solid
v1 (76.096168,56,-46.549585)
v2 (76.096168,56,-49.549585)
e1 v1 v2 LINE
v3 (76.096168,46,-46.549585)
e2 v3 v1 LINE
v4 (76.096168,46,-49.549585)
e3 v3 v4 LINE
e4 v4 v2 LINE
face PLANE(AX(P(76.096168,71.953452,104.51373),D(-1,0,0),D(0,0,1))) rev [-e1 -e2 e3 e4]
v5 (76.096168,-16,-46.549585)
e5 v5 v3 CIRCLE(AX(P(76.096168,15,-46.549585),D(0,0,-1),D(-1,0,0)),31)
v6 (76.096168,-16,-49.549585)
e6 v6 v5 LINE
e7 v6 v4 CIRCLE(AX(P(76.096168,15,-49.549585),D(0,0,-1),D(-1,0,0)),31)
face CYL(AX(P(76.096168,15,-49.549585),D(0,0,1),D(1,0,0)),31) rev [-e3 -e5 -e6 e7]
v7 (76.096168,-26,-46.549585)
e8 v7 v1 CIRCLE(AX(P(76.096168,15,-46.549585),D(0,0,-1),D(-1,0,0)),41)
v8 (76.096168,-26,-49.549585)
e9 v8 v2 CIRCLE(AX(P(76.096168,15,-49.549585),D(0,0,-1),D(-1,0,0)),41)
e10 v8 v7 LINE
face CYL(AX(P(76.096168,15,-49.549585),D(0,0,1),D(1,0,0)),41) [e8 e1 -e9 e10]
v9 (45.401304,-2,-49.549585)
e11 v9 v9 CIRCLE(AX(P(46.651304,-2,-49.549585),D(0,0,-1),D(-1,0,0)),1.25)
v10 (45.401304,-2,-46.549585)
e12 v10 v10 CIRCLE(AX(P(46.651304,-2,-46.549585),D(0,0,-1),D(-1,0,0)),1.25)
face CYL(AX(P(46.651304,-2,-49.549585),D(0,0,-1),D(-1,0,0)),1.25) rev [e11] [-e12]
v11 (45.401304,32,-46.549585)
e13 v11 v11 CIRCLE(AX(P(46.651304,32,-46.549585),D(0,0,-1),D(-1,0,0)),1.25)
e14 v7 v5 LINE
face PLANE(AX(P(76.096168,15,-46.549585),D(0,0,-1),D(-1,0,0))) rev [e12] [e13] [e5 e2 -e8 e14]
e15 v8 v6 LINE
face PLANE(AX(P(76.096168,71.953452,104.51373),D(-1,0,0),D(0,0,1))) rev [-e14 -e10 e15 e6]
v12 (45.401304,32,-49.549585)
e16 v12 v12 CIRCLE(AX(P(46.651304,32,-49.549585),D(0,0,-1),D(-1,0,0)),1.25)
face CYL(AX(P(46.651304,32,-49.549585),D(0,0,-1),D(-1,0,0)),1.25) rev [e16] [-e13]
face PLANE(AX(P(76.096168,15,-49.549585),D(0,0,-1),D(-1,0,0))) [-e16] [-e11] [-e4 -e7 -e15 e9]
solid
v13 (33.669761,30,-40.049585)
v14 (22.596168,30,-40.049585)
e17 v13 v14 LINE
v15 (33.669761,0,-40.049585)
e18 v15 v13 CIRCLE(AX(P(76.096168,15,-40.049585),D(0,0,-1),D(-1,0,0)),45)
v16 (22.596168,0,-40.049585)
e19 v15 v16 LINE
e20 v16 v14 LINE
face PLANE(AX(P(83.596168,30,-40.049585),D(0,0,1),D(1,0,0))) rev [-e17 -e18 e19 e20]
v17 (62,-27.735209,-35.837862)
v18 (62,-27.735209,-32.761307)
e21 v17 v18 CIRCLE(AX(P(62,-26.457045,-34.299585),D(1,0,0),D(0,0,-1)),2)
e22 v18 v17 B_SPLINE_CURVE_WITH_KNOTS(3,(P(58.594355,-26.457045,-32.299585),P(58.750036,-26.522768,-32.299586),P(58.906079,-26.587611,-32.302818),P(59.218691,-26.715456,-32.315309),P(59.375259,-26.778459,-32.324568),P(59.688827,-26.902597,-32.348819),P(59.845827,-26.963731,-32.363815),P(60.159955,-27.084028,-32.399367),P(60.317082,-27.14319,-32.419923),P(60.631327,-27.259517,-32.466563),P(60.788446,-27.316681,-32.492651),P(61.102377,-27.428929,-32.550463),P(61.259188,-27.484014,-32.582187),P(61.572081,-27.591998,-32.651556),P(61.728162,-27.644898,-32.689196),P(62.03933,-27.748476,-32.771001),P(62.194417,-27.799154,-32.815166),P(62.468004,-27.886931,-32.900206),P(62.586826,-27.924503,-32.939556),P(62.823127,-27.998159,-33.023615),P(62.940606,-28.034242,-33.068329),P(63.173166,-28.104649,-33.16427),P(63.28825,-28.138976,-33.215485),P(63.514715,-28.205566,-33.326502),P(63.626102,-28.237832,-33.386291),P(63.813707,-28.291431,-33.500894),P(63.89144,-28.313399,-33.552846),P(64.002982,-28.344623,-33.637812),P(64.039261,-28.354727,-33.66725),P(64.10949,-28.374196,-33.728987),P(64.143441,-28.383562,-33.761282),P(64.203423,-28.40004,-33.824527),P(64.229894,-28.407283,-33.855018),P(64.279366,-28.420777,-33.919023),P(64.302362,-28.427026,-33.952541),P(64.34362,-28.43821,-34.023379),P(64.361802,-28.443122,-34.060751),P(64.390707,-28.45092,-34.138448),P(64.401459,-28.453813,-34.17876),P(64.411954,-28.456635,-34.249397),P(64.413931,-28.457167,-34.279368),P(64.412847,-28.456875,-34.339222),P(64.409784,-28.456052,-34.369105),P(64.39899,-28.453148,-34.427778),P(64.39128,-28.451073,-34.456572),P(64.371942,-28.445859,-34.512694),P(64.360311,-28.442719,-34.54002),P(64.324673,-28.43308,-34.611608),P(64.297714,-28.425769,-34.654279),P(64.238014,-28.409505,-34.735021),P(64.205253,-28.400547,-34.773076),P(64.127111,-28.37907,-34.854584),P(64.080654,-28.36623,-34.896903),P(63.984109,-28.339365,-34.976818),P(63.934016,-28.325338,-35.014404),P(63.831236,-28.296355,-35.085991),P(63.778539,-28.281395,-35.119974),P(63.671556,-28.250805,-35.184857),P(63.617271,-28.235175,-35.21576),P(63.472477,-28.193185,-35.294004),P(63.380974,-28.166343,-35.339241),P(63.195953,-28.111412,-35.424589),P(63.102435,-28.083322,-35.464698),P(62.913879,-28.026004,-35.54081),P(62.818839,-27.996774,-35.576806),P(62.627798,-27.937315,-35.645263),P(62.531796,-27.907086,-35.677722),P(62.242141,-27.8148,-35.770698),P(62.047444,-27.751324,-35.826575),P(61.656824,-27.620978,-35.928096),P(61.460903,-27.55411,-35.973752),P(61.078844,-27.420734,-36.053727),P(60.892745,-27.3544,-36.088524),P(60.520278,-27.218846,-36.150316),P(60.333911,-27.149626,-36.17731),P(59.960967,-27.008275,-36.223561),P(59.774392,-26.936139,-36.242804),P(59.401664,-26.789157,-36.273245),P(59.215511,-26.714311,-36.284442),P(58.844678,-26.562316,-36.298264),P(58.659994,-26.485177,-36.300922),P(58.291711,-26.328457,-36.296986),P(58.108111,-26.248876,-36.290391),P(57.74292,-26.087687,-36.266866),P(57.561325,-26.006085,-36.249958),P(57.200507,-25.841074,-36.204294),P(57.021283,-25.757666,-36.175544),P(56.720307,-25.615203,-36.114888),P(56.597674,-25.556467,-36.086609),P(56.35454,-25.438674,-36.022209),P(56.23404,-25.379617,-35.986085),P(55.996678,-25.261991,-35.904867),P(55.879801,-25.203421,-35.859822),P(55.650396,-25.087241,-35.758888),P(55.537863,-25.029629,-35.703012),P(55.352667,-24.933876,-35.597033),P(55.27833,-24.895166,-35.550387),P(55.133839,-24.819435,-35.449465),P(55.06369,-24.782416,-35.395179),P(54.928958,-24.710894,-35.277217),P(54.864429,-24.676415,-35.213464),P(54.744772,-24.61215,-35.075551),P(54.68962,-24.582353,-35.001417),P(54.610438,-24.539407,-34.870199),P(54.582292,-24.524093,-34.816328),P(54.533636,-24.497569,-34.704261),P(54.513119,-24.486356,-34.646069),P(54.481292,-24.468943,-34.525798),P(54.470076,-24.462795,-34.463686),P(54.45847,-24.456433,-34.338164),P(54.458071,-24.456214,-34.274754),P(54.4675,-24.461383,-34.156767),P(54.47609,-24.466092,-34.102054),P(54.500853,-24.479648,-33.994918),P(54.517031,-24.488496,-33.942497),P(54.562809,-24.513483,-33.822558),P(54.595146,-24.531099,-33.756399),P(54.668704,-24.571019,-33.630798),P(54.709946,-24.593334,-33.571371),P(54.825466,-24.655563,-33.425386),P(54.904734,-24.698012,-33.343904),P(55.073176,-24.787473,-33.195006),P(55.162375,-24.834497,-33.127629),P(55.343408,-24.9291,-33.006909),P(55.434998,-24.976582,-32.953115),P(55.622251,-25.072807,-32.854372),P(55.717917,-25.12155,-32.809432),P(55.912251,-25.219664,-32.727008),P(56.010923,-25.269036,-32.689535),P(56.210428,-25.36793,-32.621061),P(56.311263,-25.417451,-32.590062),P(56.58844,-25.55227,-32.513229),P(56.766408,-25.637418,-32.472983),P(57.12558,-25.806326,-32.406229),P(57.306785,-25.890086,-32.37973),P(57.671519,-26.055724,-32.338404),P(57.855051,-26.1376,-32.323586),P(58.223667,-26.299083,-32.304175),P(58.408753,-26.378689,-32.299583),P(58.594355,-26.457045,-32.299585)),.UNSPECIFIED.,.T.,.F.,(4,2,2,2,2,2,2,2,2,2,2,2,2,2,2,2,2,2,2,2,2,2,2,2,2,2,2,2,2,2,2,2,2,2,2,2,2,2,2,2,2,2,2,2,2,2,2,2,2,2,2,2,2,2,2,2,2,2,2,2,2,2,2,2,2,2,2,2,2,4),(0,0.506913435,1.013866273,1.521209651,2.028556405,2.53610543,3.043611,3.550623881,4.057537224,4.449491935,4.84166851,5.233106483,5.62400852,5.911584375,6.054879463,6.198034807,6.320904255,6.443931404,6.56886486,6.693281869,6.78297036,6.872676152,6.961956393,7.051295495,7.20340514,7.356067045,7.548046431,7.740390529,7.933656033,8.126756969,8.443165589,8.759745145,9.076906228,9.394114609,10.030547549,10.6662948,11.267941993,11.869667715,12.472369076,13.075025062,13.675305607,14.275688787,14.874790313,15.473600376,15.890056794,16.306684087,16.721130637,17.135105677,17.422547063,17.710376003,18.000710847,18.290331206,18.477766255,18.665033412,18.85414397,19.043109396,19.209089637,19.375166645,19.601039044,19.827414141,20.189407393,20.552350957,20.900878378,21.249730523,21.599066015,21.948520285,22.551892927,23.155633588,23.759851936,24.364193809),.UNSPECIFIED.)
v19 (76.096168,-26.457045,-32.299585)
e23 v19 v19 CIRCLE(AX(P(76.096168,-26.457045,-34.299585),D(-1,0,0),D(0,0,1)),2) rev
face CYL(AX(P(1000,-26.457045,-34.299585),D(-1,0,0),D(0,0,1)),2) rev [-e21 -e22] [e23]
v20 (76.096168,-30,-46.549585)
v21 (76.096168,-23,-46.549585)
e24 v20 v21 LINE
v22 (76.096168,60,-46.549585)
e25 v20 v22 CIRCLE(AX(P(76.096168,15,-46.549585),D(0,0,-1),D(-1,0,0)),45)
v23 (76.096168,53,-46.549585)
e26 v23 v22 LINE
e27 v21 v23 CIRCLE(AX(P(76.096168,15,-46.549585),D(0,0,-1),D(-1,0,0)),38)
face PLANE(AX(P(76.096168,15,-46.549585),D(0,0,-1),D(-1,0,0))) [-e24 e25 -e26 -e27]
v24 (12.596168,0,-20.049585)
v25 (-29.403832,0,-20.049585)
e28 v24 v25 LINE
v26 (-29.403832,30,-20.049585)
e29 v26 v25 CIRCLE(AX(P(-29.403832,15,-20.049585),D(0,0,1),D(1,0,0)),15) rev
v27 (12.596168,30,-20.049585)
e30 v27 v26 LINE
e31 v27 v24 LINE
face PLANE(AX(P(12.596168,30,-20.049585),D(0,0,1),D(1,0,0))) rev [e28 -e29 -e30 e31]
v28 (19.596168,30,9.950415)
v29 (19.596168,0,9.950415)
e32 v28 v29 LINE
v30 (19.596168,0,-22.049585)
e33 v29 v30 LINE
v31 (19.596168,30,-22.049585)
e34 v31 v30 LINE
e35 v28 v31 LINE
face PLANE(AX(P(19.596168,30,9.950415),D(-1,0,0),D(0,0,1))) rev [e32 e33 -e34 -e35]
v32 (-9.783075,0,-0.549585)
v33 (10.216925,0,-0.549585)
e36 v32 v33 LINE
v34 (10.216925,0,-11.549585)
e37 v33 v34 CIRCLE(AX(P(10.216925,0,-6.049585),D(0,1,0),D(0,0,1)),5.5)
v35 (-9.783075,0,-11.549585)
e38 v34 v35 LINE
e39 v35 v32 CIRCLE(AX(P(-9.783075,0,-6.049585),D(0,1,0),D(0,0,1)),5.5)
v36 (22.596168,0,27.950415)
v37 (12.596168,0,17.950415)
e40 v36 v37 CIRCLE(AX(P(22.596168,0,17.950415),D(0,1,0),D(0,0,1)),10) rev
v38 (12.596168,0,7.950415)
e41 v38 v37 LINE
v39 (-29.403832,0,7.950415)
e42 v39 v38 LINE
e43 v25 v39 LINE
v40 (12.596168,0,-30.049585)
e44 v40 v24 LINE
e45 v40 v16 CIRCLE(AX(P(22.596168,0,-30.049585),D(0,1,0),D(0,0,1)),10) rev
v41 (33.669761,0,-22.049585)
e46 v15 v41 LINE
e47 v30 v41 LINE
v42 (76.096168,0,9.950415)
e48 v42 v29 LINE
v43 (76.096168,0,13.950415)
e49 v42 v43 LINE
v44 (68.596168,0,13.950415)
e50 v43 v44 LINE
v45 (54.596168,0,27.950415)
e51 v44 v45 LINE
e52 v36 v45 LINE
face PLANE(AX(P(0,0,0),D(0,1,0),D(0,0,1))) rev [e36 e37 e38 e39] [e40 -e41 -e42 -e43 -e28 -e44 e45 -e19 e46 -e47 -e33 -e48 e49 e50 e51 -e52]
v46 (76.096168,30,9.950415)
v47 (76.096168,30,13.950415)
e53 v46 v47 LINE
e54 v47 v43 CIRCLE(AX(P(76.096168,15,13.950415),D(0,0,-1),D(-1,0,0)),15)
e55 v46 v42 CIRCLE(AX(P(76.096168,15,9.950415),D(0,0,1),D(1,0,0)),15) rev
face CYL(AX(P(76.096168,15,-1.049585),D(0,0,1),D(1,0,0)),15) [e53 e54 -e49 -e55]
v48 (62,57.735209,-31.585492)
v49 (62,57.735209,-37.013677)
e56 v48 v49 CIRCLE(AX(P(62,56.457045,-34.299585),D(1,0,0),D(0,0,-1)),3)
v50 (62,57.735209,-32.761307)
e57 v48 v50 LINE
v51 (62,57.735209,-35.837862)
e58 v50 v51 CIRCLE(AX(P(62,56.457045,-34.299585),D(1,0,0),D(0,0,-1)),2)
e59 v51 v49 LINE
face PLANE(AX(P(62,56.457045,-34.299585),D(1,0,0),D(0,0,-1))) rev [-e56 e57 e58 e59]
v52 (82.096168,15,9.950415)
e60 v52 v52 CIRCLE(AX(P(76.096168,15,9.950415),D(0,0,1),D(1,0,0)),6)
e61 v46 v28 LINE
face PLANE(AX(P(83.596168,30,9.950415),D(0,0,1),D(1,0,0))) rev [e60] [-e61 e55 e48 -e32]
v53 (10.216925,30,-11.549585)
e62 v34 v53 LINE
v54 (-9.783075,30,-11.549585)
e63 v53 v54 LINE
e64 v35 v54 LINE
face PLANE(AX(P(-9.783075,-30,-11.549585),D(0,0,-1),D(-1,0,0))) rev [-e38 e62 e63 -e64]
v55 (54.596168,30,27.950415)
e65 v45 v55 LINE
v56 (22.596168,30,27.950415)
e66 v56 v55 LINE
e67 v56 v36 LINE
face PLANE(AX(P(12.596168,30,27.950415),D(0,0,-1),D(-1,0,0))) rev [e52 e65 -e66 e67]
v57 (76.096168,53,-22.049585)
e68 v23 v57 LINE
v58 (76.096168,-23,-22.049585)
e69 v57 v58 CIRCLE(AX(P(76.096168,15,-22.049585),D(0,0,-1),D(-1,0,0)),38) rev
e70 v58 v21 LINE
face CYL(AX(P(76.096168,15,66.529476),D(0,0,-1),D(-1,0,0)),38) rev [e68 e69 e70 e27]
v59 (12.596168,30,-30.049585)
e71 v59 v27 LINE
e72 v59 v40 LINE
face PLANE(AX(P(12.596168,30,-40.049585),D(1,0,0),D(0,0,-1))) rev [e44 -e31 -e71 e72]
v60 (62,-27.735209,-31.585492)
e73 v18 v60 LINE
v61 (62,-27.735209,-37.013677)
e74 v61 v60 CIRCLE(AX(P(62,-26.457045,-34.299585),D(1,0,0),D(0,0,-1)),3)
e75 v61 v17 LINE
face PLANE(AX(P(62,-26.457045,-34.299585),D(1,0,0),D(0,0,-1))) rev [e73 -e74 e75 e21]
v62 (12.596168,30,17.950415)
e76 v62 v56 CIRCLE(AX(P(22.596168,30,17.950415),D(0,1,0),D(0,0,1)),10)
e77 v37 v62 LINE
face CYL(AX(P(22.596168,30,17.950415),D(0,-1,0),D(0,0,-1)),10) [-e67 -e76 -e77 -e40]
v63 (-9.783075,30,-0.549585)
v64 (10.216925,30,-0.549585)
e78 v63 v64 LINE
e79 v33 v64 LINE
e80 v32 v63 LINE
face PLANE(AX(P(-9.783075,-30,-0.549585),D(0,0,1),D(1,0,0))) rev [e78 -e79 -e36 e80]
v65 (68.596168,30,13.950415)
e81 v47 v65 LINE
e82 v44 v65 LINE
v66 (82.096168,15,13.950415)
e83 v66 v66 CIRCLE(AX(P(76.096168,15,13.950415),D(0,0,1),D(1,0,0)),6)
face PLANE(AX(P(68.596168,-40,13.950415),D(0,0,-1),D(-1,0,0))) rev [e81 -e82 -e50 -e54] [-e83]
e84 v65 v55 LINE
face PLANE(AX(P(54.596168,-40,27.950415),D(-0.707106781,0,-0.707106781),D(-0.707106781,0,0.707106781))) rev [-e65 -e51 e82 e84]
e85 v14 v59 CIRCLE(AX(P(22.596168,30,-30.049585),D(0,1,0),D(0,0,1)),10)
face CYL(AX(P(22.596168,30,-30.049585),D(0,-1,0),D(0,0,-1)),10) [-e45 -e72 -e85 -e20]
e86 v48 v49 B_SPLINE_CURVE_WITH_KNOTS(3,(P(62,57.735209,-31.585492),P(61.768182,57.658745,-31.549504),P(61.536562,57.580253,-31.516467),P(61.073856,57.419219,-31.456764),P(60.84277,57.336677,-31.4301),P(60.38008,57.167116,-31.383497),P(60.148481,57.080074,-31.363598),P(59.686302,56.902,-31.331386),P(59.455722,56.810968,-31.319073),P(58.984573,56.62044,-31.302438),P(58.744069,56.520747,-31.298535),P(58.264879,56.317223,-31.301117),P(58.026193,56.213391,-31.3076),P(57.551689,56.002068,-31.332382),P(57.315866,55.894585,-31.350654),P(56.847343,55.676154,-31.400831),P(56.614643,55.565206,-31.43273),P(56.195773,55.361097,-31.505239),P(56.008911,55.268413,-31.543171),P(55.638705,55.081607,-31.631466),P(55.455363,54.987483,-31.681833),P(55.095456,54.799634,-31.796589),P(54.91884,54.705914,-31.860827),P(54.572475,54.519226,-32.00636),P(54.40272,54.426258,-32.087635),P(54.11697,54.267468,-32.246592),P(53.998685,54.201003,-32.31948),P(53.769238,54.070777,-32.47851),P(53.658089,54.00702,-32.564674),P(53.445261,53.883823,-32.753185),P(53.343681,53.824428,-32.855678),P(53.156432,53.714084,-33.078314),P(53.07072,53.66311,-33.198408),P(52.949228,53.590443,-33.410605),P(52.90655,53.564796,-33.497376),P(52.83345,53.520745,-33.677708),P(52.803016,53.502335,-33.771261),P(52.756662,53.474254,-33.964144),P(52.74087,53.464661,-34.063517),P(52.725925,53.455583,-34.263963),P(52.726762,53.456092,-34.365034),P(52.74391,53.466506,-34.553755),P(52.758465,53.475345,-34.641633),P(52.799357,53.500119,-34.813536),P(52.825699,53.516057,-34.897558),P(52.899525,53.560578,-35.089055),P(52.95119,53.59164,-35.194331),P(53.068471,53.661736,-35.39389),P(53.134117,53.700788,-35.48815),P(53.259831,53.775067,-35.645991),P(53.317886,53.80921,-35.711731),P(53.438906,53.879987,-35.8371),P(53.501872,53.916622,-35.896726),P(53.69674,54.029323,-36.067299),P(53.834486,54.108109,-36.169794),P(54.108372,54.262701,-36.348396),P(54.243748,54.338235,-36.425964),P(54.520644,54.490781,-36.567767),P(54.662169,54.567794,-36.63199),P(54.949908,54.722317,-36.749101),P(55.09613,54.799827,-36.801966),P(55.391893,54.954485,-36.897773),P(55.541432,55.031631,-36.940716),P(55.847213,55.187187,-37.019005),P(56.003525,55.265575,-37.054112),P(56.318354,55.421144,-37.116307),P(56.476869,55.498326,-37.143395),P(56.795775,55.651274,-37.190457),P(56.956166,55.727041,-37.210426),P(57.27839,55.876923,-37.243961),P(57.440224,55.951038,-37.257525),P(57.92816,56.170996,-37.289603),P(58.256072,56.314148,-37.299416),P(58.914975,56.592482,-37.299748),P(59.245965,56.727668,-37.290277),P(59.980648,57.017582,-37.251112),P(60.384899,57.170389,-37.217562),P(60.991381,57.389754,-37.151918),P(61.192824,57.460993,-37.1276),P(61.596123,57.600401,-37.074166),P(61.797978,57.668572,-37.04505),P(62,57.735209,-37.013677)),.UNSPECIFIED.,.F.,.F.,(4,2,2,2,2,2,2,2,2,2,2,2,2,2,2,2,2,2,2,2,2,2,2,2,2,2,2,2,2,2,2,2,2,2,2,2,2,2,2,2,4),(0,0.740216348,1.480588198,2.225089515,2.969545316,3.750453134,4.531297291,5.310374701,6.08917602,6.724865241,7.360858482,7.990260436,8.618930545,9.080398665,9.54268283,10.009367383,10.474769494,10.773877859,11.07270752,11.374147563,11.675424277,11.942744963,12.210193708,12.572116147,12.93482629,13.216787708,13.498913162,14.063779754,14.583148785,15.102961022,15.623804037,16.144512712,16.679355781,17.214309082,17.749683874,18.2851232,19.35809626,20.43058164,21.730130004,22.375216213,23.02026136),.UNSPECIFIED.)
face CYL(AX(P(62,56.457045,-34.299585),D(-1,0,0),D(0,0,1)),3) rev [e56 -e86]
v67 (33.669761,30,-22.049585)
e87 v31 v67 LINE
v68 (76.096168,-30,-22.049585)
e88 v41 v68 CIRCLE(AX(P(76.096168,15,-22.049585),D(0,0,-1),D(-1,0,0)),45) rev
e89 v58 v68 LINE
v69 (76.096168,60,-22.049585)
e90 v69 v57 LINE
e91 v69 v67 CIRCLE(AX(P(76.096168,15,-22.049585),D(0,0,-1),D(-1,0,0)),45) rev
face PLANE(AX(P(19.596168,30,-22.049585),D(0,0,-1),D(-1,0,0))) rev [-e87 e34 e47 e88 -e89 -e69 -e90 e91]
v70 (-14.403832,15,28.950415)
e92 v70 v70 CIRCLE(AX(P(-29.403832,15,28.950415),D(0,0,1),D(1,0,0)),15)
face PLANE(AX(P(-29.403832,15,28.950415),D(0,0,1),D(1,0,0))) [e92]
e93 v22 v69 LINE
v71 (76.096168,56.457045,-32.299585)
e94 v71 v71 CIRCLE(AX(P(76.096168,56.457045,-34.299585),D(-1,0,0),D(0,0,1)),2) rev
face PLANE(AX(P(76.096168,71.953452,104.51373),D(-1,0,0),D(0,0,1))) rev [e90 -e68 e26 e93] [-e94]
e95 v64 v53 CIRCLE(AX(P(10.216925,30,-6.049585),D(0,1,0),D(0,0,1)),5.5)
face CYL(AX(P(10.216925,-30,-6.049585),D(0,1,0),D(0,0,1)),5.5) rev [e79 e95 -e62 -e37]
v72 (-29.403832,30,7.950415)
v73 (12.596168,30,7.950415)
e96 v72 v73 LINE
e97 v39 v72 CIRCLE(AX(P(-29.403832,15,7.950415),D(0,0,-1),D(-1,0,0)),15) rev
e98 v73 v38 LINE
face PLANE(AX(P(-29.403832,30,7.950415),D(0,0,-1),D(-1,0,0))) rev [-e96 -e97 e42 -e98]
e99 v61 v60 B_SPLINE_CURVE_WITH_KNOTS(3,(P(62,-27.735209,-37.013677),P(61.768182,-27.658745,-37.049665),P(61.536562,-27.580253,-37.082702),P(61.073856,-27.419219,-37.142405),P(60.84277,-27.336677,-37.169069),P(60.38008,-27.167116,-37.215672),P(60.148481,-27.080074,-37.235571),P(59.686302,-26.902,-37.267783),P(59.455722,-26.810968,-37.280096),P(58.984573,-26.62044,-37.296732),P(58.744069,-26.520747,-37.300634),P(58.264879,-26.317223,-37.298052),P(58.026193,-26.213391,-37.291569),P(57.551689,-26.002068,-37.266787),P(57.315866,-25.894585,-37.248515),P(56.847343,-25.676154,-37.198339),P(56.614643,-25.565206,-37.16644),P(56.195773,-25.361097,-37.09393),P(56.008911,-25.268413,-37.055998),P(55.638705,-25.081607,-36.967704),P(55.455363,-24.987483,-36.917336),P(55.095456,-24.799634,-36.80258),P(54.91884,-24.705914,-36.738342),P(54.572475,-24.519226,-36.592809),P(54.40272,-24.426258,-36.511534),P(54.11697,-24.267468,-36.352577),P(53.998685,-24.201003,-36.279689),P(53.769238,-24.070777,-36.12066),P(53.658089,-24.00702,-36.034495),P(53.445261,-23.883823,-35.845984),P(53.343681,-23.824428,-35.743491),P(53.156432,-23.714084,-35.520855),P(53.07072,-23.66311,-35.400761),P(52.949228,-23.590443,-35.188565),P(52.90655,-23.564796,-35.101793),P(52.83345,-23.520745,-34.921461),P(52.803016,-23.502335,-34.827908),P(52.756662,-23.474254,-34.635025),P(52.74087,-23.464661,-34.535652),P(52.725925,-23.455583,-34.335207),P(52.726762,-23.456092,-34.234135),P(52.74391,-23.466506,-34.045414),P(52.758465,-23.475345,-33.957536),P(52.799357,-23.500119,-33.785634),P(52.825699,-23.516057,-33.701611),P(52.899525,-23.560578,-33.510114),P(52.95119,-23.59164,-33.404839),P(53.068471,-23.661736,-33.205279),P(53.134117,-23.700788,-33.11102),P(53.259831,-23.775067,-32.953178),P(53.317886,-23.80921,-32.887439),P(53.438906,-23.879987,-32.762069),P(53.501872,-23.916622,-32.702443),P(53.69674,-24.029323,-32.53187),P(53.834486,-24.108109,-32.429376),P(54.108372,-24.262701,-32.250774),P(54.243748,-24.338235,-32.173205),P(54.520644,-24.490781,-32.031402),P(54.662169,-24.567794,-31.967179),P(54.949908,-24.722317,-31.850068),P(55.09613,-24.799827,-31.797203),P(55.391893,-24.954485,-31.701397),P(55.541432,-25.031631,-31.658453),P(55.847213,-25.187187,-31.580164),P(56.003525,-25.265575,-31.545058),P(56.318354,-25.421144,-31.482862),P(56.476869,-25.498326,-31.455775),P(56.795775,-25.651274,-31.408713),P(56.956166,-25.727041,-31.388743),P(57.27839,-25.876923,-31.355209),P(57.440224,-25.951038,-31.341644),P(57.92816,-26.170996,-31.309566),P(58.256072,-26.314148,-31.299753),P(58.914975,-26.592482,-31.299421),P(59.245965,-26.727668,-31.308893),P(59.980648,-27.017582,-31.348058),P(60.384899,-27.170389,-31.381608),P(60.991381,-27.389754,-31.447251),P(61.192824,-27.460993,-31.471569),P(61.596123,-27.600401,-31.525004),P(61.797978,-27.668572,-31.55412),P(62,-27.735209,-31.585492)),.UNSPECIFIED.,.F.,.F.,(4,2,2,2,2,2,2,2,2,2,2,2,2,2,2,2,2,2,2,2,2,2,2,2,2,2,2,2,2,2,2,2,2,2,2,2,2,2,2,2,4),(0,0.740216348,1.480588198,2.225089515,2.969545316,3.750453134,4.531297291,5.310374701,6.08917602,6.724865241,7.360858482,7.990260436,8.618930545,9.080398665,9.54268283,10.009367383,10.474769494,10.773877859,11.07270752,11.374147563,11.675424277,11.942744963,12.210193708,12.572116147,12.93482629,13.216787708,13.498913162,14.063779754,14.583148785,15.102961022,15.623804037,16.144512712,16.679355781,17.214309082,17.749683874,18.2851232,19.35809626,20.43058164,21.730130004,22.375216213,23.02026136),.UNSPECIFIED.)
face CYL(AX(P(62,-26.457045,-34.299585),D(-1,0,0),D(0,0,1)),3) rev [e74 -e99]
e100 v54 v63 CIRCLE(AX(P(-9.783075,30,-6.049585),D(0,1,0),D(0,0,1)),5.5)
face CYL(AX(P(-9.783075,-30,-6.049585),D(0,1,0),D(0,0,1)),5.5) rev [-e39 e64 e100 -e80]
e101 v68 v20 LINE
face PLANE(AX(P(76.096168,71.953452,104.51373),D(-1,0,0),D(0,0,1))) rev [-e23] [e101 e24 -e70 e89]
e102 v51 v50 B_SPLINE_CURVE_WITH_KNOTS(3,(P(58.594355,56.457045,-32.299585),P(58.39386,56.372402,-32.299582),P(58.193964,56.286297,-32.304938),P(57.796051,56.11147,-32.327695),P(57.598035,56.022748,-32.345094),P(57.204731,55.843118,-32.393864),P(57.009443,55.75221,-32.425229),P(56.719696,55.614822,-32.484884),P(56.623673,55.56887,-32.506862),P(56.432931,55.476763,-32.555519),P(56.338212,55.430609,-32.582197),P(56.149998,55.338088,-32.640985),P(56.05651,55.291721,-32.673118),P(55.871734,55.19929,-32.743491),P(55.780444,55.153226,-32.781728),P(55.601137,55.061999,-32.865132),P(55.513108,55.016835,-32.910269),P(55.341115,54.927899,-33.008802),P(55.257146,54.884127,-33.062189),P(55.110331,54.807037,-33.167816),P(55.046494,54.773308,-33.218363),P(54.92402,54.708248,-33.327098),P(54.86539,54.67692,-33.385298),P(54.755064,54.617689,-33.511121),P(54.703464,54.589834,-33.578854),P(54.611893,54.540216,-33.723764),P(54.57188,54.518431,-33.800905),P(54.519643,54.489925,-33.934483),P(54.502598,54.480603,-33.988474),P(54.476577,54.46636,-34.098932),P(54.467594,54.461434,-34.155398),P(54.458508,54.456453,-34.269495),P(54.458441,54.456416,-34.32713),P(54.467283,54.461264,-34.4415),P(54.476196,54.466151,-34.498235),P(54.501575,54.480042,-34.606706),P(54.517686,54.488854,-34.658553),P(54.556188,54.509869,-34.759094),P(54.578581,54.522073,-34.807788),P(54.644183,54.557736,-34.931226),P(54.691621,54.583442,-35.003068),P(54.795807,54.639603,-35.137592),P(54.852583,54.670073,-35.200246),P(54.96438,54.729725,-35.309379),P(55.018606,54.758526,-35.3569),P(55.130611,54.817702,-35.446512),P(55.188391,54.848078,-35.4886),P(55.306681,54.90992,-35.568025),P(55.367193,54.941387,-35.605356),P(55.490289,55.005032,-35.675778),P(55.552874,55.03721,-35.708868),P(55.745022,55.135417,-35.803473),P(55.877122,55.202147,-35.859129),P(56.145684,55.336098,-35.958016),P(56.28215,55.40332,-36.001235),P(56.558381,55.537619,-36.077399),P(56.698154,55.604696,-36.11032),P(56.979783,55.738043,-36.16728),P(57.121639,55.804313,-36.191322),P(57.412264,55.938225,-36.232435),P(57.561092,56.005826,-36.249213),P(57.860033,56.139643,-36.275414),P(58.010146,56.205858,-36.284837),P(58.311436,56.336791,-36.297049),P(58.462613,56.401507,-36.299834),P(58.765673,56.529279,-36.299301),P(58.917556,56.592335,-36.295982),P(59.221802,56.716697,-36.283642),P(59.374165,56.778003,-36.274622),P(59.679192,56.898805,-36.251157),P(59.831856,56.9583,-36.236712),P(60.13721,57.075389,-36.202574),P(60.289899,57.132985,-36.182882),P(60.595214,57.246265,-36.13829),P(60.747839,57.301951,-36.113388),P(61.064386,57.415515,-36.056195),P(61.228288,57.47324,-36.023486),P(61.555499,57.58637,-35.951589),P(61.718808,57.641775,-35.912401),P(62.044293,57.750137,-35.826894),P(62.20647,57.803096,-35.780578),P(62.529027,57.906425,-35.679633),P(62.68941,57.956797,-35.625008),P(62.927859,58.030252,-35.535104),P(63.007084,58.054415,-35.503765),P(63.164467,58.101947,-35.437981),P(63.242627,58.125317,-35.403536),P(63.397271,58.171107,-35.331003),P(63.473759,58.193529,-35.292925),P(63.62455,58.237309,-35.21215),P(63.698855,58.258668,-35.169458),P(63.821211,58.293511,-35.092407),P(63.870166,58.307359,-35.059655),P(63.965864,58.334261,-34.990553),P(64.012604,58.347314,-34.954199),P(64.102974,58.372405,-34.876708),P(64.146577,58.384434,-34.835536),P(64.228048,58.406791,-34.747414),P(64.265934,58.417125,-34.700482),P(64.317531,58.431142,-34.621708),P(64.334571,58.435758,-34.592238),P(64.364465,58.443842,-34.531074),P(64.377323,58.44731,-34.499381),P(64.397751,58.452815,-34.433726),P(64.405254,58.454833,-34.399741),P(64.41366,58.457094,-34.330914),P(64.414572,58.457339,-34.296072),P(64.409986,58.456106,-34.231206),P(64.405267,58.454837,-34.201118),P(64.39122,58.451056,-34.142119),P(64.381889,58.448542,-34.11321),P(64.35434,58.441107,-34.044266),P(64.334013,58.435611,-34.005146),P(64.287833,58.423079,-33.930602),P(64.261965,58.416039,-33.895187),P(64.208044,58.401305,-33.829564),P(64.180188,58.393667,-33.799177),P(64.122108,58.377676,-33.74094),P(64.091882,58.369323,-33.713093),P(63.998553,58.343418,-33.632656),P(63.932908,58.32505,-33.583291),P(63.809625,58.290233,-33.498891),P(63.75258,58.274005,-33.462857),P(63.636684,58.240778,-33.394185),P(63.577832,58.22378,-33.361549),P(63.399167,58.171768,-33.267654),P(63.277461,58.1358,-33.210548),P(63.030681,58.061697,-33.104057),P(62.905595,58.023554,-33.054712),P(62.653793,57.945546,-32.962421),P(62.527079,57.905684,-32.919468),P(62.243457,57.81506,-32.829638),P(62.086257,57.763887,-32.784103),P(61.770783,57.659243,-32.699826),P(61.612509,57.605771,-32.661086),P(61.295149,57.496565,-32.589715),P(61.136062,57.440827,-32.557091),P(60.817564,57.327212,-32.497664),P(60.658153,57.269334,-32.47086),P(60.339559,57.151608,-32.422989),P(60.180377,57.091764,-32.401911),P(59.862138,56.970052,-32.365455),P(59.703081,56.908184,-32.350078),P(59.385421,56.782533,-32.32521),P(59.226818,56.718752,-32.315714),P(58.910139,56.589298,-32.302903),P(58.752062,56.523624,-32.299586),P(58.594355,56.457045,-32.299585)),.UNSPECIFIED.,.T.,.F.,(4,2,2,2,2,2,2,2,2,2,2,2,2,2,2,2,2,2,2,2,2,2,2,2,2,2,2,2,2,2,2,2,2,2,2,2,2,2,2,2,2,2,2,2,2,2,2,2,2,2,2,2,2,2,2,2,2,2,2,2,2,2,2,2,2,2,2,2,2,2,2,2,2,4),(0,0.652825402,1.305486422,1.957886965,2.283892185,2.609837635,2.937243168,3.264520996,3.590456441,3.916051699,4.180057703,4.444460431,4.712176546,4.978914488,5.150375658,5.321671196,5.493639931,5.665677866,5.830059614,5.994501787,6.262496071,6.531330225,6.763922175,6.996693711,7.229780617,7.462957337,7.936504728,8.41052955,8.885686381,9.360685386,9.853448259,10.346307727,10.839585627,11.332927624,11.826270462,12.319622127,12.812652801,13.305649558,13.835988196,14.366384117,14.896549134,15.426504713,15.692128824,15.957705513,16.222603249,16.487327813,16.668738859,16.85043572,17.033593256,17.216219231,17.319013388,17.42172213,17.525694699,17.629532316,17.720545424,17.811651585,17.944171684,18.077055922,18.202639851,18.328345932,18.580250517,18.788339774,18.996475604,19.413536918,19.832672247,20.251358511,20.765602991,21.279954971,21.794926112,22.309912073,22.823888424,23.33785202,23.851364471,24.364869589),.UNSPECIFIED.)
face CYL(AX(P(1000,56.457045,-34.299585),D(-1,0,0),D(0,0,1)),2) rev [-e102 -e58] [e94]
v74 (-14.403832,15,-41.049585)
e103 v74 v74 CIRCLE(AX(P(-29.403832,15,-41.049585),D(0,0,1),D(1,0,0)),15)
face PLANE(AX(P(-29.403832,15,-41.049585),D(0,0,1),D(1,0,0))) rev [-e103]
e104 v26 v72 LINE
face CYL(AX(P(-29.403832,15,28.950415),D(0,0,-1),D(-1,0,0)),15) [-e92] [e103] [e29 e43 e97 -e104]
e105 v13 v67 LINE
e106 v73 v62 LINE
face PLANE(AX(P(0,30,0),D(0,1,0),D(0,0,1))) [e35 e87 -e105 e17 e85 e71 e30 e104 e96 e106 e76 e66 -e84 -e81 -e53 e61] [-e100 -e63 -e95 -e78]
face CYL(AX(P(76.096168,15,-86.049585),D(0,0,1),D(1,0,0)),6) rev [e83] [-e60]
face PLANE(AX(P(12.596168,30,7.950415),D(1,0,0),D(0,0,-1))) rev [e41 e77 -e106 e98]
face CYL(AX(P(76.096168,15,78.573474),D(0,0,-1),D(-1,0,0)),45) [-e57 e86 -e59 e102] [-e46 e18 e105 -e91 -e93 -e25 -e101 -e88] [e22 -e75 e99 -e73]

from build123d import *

# Parameters (mm, degrees)
BOSS_EXTRUDE1_DEPTH        = 30
FILLET1_R                  = 10
SKETCH4_R                  = 15
BOSS_EXTRUDE2_DEPTH        = 35
CUT_EXTRUDE1_DEPTH         = 70
SKETCH8_R                  = 6.000000000000003
CUT_EXTRUDE2_DEPTH         = 100
SKETCH9_W                  = 3.9999999999999982
SKETCH9_H                  = 30.000000000000004
BOSS_EXTRUDE3_DEPTH        = 10
CUT_EXTRUDE4_DEPTH         = 15
BOSS_EXTRUDE4_DEPTH        = 18
CUT_EXTRUDE8_START         = -18
CUT_EXTRUDE8_DEPTH         = 18
BOSS_EXTRUDE5_DEPTH        = 18
SKETCH18_R                 = 44.999999999999964
SKETCH18_R_2               = 37.99999999999997
BOSS_EXTRUDE6_DEPTH        = 6.5
SKETCH20_R                 = 41
SKETCH20_R_2               = 31
BOSS_EXTRUDE7_DEPTH        = 3
CUT_EXTRUDE15_START        = -27.5
CUT_EXTRUDE15_DEPTH        = 27.5
SKETCH27_R                 = 2.0000000000000036
CUT_EXTRUDE18_DEPTH        = 1000
CUT_EXTRUDE19_DEPTH        = 120.80681590516343
SKETCH29_R                 = 3.0000000000000018
CUT_EXTRUDE20_DEPTH        = 62
M3_TAPPED_HOLE1_AT_2_COUNT = 2
M3_TAPPED_HOLE1_AT_2_PITCH = 34.00000000000008


# Read off the part's stored shape, not the designer's step: Cut-Extrude15
with BuildPart() as part:
    # Sketch1 → Boss-Extrude1 (new body)
    with BuildSketch(Plane(origin=(0, 0, 0), x_dir=(1, 0, 0), z_dir=(0, 1, 0))):
        Polygon((-29.403832198091994, 20.049584631360354), (-29.403832198091994, -7.950415368639647), (12.596167801908011, -7.9504153686396455), (12.596167801908013, -27.950415368639646), (83.59616780190801, -27.950415368639643), (83.59616780190801, -9.950415368639646), (19.596167801908006, -9.950415368639622), (19.596167801908013, 22.049584631360172), (83.596167801908, 22.049584631360354), (83.596167801908, 40.049584631360354), (12.596167801908003, 40.049584631360354), (12.596167801908011, 20.04958463136035), align=None)
    extrude(amount=BOSS_EXTRUDE1_DEPTH)

    # Fillet1
    fillet1_edges = [part.edges().sort_by_distance(p)[0] for p in [
        (12.596167801908003, 15, -40.049584631360354),
        (12.596167801908013, 15, 27.950415368639646),
    ]]
    fillet(fillet1_edges, radius=FILLET1_R)

    # Sketch4 → Boss-Extrude2 (add, symmetric)
    with BuildSketch(Plane.XY.offset(-6.049584631360346)):
        with Locations((-29.403832198091994, 15)):
            Circle(SKETCH4_R)
    extrude(amount=BOSS_EXTRUDE2_DEPTH, both=True)

    # Sketch5 → Cut-Extrude1 (cut)
    with BuildSketch(Plane(origin=(0, 30, 0), x_dir=(1, 0, 0), z_dir=(0, 1, 0))):
        Polygon((54.59616780190807, -27.950415368639646), (68.59616780190801, -13.950415368639645), (83.59616780190801, -13.950415368639646), (83.59616780190801, -27.950415368639643), align=None)
    extrude(amount=-CUT_EXTRUDE1_DEPTH, mode=Mode.SUBTRACT)

    # Sketch8 → Cut-Extrude2 (cut)
    with BuildSketch(Plane.XY.offset(13.950415368639636)):
        with Locations((76.09616780190801, 14.999999999999998)):
            Circle(SKETCH8_R)
    extrude(amount=-CUT_EXTRUDE2_DEPTH, mode=Mode.SUBTRACT)

    # Sketch9 → Boss-Extrude3 (add)
    with BuildSketch(Plane(origin=(83.59616780190801, 0, 0), x_dir=(0, 0, -1), z_dir=(1, 0, 0))):
        with Locations((-11.950415368639668, 15.000000000000002)):
            Rectangle(SKETCH9_W, SKETCH9_H)
    extrude(amount=BOSS_EXTRUDE3_DEPTH)

    # Sketch14 → Cut-Extrude4 (cut)
    with BuildSketch(Plane.XY.offset(13.950415368639636)):
        with BuildLine():
            Line((76.09616780190801, 30), (93.59616780190801, 30))
            Line((93.59616780190801, 30), (93.59616780190801, 0))
            Line((93.59616780190801, 0), (76.09616780190801, 0))
            ThreePointArc((76.09616780190801, 0), (91.09616780190801, 14.999999999999998), (76.09616780190801, 30))
        make_face()
    extrude(amount=-CUT_EXTRUDE4_DEPTH, mode=Mode.SUBTRACT)

    # Sketch13 → Boss-Extrude4 (add)
    with BuildSketch(Plane(origin=(0, 0, -40.049584631360354), x_dir=(-1, 0, -2.3e-16), z_dir=(2.3e-16, 0, -1))):
        with BuildLine():
            Line((-76.09616780190801, -29.999999999999993), (-76.09616780190802, 59.99999999999999))
            ThreePointArc((-76.09616780190802, 59.99999999999999), (-31.096167801908017, 15.000000000000009), (-76.09616780190801, -29.999999999999993))
        make_face()
    extrude(amount=-BOSS_EXTRUDE4_DEPTH)

    # Sketch16 → Cut-Extrude8 (cut)
    with BuildSketch(Plane(origin=(0, 0, -40.049584631360354), x_dir=(-1, 0, -7.8e-16), z_dir=(7.8e-16, 0, -1)).offset(CUT_EXTRUDE8_START)):
        with BuildLine():
            ThreePointArc((-76.09616780190801, -23), (-38.09616780190802, 15.000000000000009), (-76.09616780190804, 52.999999999999986))
            Line((-76.09616780190804, 52.99999999999999), (-76.09616780190802, 30))
            ThreePointArc((-76.09616780190802, 30.000000000000004), (-61.09616780190801, 15.000000000000012), (-76.09616780190801, 3.55e-15))
            Line((-76.09616780190802, 0), (-76.09616780190801, -22.999999999999993))
        make_face()
        with BuildLine():
            Line((-76.09616780190802, 20.999999999999996), (-76.09616780190802, 30))
            Line((-76.09616780190802, 30), (-83.596167801908, 30))
            Line((-83.596167801908, 30), (-83.596167801908, 0))
            Line((-83.596167801908, 0), (-76.09616780190801, -6.94e-15))
            Line((-76.09616780190802, 0), (-76.09616780190802, 8.999999999999993))
            ThreePointArc((-76.09616780190801, 8.999999999999996), (-82.09616780190801, 14.999999999999996), (-76.09616780190801, 20.999999999999996))
        make_face()
        with BuildLine():
            ThreePointArc((-76.09616780190801, 3.55e-15), (-61.09616780190801, 15.000000000000012), (-76.09616780190802, 30.000000000000004))
            Line((-76.09616780190802, 30), (-76.09616780190802, 20.999999999999996))
            Line((-76.09616780190802, 20.999999999999996), (-76.09616780190802, 8.999999999999993))
            Line((-76.09616780190802, 8.999999999999993), (-76.09616780190802, 0))
        make_face()
    extrude(amount=CUT_EXTRUDE8_DEPTH, mode=Mode.SUBTRACT)

    # Sketch17 → Boss-Extrude5 (add)
    with BuildSketch(Plane(origin=(0, 0, -40.049584631360354), x_dir=(-1, 0, -7.8e-16), z_dir=(7.8e-16, 0, -1))):
        with BuildLine():
            Line((-76.09616780190802, 59.99999999999999), (-76.09616780190804, 52.99999999999998))
            ThreePointArc((-76.09616780190804, 52.99999999999998), (-113.88848540609249, 11.032541102361632), (-68.20461692079768, -22.17154052081842))
            Line((-68.20461692079768, -22.17154052081842), (-68.20461692079766, -29.302634511853192))
            ThreePointArc((-68.20461692079766, -29.302634511853192), (-120.92148739381611, 11.038848212539316), (-76.09616780190802, 59.99999999999999))
        make_face()
    extrude(amount=-BOSS_EXTRUDE5_DEPTH)

    # Sketch18 → Boss-Extrude6 (add)
    with BuildSketch(Plane(origin=(0, 0, -40.049584631360354), x_dir=(-1, 0, -7.8e-16), z_dir=(7.8e-16, 0, -1))):
        with Locations((-76.09616780190805, 14.999999999999998)):
            Circle(SKETCH18_R)
        with Locations((-76.09616780190805, 14.999999999999998)):
            Circle(SKETCH18_R_2, mode=Mode.SUBTRACT)
    extrude(amount=BOSS_EXTRUDE6_DEPTH)


with BuildPart() as body_2:
    # Sketch20 → Boss-Extrude7 (new body)
    with BuildSketch(Plane(origin=(3.639e-14, 0, -46.549584631360354), x_dir=(-1, 0, -7.8e-16), z_dir=(7.8e-16, 0, -1))):
        with Locations((-76.09616780190802, 14.999999999999998)):
            Circle(SKETCH20_R)
        with Locations((-76.09616780190802, 14.999999999999998)):
            Circle(SKETCH20_R_2, mode=Mode.SUBTRACT)
    extrude(amount=BOSS_EXTRUDE7_DEPTH)


with BuildPart() as cut_extrude15_tool:
    # Cut-Extrude15 outline → Cut-Extrude15 (new body)
    with BuildSketch(Plane(origin=(3.874e-14, 0, -49.549584631360354), x_dir=(-1, 0, -7.8e-16), z_dir=(7.8e-16, 0, -1)).offset(CUT_EXTRUDE15_START)):
        with BuildLine():
            ThreePointArc((-76.096167802, -16), (-107.096167802, 15), (-76.096167802, 46))
            Line((-76.096167802, 46), (-76.096167802, 60))
            ThreePointArc((-76.096167802, 60), (-121.096167802, 15), (-76.096167802, -30))
            Line((-76.096167802, -30), (-76.096167802, -16))
        make_face()
    extrude(amount=CUT_EXTRUDE15_DEPTH)


with BuildPart() as part_1:
    add(part.part)

    # Cut-Extrude15: cut by cut_extrude15_tool
    add(cut_extrude15_tool.part, mode=Mode.SUBTRACT)

    # Sketch27 → Cut-Extrude18 (cut)
    with BuildSketch(Plane(origin=(0, 0, 0), x_dir=(0, 0, -1), z_dir=(1, 0, 0))):
        with Locations(Location((34.29958463136034, 56.45704467353929, 0), (0, 0, 180))):
            Circle(SKETCH27_R)
        with Locations(Location((34.29958463136034, -26.457044673539237, 0), (0, 0, 180))):
            Circle(SKETCH27_R)
    extrude(amount=CUT_EXTRUDE18_DEPTH, mode=Mode.SUBTRACT)

    # Sketch28 → Cut-Extrude19 (cut, through all)
    with BuildSketch(Plane(origin=(0, 30, 0), x_dir=(1, 0, 0), z_dir=(0, 1, 0))):
        with BuildLine():
            Line((-9.783074876156928, 11.549584631360354), (10.216925123843072, 11.549584631360354))
            ThreePointArc((10.216925123843072, 11.549584631360354), (15.716925123843072, 6.0495846313603545), (10.216925123843072, 0.5495846313603534))
            Line((10.216925123843072, 0.5495846313603534), (-9.783074876156928, 0.5495846313603552))
            ThreePointArc((-9.783074876156928, 0.5495846313603552), (-15.28307487615696, 6.0495846313603225), (-9.783074876156928, 11.549584631360354))
        make_face()
    extrude(amount=-CUT_EXTRUDE19_DEPTH, mode=Mode.SUBTRACT)

    # Sketch29 → Cut-Extrude20 (cut)
    with BuildSketch(Plane(origin=(0, 0, 0), x_dir=(0, 0, -1), z_dir=(1, 0, 0))):
        with Locations((34.29958463136034, 56.45704467353929)):
            Circle(SKETCH29_R)
        with Locations((34.29958463136034, -26.457044673539237)):
            Circle(SKETCH29_R)
    extrude(amount=CUT_EXTRUDE20_DEPTH, mode=Mode.SUBTRACT)


with BuildPart() as body_2_1:
    add(body_2.part)

    # Cut-Extrude15: cut by cut_extrude15_tool
    add(cut_extrude15_tool.part, mode=Mode.SUBTRACT)

    # Sketch31 → M3 Tapped Hole1 (revolve, cut)
    with BuildSketch(Plane(origin=(46.65130407323663, 32.00000000000077, -49.54958463136032), x_dir=(0, 1, 0), z_dir=(1, 0, 7.8e-16))):
        Polygon((0, 0), (-1.923e-14, 78.50000000000006), (1.2499999999999898, 78.50000000000006), (1.2499999999999871, -1.4e-15), align=None)
    m3_tapped_hole1 = revolve(axis=Axis((46.65130407323664, 32.00000000000077, -55.89958463136031), (-8.1e-16, 0, 1)), mode=Mode.SUBTRACT)

    # M3 Tapped Hole1 at 2: M3 Tapped Hole1 ×2
    with Locations(*[(0, -i * M3_TAPPED_HOLE1_AT_2_PITCH, 0) for i in range(1, M3_TAPPED_HOLE1_AT_2_COUNT)]):
        add(m3_tapped_hole1, mode=Mode.SUBTRACT)


solid = Compound([part_1.part, body_2_1.part])
